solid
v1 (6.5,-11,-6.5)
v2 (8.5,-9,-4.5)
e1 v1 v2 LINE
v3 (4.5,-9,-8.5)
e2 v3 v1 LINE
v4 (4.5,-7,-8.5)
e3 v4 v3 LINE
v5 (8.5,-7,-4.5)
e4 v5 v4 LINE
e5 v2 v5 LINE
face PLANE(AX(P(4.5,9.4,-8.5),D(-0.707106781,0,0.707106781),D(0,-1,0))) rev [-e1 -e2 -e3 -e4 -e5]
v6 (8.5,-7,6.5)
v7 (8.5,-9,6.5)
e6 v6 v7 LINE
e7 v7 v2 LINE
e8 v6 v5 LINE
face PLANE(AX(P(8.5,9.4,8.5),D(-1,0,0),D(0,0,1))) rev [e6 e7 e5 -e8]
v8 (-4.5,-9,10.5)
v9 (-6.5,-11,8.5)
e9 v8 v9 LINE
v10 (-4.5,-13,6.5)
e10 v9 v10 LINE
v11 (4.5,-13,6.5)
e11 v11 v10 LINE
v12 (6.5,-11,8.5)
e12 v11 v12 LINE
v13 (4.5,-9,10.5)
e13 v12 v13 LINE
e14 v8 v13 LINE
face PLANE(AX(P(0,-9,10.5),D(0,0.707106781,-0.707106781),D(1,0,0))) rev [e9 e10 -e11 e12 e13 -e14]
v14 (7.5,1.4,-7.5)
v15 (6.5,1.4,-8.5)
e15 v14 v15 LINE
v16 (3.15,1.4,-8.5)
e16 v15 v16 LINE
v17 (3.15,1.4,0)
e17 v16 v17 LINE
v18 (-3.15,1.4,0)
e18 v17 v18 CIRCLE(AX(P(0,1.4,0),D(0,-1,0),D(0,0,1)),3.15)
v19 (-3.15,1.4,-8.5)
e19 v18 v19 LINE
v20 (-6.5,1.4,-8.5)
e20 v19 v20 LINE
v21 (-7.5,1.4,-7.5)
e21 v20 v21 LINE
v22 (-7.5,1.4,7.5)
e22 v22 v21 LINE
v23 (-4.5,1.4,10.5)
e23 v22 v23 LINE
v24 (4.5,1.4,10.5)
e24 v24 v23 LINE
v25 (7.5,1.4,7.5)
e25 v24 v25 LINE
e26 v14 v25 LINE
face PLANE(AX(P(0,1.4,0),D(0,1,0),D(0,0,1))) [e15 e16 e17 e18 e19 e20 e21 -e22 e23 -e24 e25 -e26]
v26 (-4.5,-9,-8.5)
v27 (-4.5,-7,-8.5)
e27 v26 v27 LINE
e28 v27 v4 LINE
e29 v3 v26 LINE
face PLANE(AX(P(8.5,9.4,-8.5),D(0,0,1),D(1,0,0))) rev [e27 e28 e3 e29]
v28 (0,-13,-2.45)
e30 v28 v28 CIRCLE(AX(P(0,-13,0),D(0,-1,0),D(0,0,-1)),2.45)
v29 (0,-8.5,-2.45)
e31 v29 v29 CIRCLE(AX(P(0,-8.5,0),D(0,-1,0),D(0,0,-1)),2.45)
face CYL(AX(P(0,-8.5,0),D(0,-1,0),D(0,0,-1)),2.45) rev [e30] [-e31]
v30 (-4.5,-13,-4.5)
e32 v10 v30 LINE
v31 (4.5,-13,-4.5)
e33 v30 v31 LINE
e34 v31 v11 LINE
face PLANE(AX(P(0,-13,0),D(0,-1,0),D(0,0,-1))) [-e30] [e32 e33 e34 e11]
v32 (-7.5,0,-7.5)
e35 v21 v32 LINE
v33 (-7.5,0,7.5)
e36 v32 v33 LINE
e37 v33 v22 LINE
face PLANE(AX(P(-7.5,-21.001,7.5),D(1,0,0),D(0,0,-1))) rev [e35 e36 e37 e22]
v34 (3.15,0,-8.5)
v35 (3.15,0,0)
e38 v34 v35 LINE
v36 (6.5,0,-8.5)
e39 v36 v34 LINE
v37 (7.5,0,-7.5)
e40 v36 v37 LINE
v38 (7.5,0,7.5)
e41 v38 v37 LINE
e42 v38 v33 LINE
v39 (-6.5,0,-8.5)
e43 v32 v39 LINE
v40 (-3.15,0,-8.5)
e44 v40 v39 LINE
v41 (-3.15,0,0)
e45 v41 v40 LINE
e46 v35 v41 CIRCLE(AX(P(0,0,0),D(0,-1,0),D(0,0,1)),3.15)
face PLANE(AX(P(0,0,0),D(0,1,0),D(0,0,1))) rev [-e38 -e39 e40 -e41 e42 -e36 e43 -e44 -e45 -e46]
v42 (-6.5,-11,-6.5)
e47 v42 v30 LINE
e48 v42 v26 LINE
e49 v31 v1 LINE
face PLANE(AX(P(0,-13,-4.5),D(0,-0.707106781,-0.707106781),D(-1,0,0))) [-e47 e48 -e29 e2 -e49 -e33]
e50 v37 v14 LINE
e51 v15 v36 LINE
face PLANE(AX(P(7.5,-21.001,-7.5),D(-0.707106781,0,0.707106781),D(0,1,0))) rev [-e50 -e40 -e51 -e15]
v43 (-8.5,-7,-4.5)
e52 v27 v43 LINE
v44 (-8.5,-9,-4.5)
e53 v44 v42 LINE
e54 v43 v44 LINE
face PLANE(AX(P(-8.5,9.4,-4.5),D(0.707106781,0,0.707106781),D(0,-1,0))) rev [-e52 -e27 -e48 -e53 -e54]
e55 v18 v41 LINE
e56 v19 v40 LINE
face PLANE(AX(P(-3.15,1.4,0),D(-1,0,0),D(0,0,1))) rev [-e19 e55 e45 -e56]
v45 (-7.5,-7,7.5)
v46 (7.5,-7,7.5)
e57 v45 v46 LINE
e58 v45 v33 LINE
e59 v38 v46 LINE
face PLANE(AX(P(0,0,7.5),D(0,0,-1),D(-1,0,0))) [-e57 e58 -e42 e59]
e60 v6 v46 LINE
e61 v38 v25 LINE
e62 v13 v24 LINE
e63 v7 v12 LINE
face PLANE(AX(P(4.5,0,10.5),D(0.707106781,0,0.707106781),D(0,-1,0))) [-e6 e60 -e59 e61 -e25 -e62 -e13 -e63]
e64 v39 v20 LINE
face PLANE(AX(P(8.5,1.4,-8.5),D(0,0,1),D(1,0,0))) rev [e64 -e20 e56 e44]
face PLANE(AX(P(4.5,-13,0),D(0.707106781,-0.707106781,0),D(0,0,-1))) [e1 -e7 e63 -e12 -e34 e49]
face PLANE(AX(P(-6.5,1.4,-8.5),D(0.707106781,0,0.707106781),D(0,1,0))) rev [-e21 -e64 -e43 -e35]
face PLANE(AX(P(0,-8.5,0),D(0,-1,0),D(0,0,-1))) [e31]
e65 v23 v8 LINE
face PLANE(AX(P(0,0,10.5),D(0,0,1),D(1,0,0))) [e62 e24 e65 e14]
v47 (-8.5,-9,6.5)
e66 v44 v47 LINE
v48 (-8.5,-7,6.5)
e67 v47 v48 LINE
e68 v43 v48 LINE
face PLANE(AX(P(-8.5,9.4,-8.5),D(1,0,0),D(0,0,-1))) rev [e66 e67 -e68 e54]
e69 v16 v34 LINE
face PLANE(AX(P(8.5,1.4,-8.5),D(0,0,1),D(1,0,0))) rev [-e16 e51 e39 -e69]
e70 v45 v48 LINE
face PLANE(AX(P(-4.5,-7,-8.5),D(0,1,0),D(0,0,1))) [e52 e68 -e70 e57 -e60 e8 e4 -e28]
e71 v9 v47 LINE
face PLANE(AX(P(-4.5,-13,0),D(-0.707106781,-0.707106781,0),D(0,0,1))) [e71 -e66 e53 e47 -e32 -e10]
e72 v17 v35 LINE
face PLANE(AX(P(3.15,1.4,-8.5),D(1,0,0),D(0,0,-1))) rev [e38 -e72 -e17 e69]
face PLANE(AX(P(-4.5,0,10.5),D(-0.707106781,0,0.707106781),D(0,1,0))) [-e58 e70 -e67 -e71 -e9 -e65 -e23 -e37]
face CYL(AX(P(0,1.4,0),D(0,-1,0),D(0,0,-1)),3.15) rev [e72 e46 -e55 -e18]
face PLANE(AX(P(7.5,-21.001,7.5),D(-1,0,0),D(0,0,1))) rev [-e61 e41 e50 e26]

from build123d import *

# Parameters (mm, degrees)
BOSS_EXTRUDE1_DEPTH = 1.4
BOSS_EXTRUDE2_DEPTH = 15
SKETCH6_W           = 17
SKETCH6_H           = 17
BOSS_EXTRUDE3_DEPTH = 6
CUT_EXTRUDE4_START  = -16
SKETCH8_W           = 17
SKETCH8_H           = 7
CUT_EXTRUDE4_DEPTH  = 16
SKETCH9_W           = 17
SKETCH9_H           = 22.4
BOSS_EXTRUDE4_DEPTH = 2
SKETCH7_4_R         = 2.45
CUT_EXTRUDE3_DEPTH  = 4.5
CHAMFER1_SIZE       = 4
CHAMFER3_SIZE       = 4
CUT_EXTRUDE5_REACH  = 28.158
CHAMFER4_SIZE       = 1
SPLIT1_START        = 2.45
SPLIT1_DEPTH        = 4.05
SPLIT1_START_2      = -4.5
SPLIT1_2_DEPTH      = 2.0499999
SPLIT1_START_3      = -21
SPLIT1_3_DEPTH      = 6
SPLIT1_START_4      = -16.5
SPLIT1_4_OUTLINE_R  = 2.45
SPLIT1_4_DEPTH      = 1.5
SPLIT1_START_5      = -20.859650045
SPLIT1_5_OUTLINE_W  = 20
SPLIT1_5_OUTLINE_H  = 18
SPLIT1_5_DEPTH      = 2.828427125
SPLIT1_START_6      = -22.273863607
SPLIT1_6_OUTLINE_W  = 20
SPLIT1_6_OUTLINE_H  = 18
SPLIT1_6_DEPTH      = 2.828427124
SPLIT1_START_7      = -9
SPLIT1_7_DEPTH      = 20
SPLIT1_8_DEPTH      = 14


with BuildPart() as part:
    # Sketch3 → Boss-Extrude1 (new body)
    with BuildSketch(Plane(origin=(0, 0, 0), x_dir=(1, 0, 0), z_dir=(0, 1, 0))):
        with BuildLine():
            Line((-3.15, 0), (-3.15, 8.5))
            Line((-3.15, 8.5), (-8.5, 8.5))
            Line((-8.5, 8.5), (-8.5, -8.5))
            Line((-8.5, -8.5), (8.5, -8.5))
            Line((8.5, -8.5), (8.5, 8.5))
            Line((8.5, 8.5), (3.15, 8.5))
            Line((3.15, 8.5), (3.15, 0))
            ThreePointArc((3.15, 0), (0, -3.15), (-3.15, 0))
        make_face()
    extrude(amount=BOSS_EXTRUDE1_DEPTH)

    # Sketch4 → Boss-Extrude2 (add)
    with BuildSketch(Plane.XZ):
        with BuildLine():
            Line((7.5, 0), (7.5, -8.5))
            Line((7.5, -8.5), (8.5, -8.5))
            Line((8.5, -8.5), (8.5, 8.5))
            Line((8.5, 8.5), (-8.5, 8.5))
            Line((-8.5, 8.5), (-8.5, -8.5))
            Line((-8.5, -8.5), (-7.5, -8.5))
            Line((-7.5, -8.5), (-7.5, 0))
            ThreePointArc((-7.5, 0), (0, 7.5), (7.5, 0))
        make_face()
    extrude(amount=BOSS_EXTRUDE2_DEPTH)

    # Sketch6 → Boss-Extrude3 (add)
    with BuildSketch(Plane.XZ.offset(15)):
        Rectangle(SKETCH6_W, SKETCH6_H)
    extrude(amount=BOSS_EXTRUDE3_DEPTH)

    # Sketch8 → Cut-Extrude4 (cut)
    with BuildSketch(Plane(origin=(0, 0, -8.5), x_dir=(-1, 0, 0), z_dir=(0, 0, -1)).offset(CUT_EXTRUDE4_START)):
        with Locations((0, -3.5)):
            Rectangle(SKETCH8_W, SKETCH8_H)
    extrude(amount=CUT_EXTRUDE4_DEPTH, mode=Mode.SUBTRACT)

    # Sketch9 → Boss-Extrude4 (add)
    with BuildSketch(Plane.XY.offset(8.5)):
        with Locations((0, -9.8)):
            Rectangle(SKETCH9_W, SKETCH9_H)
    extrude(amount=BOSS_EXTRUDE4_DEPTH)

    # Sketch7<4> → Cut-Extrude3 (cut)
    with BuildSketch(Plane.XZ.offset(21)):
        with Locations(Location((0, 0, 0), (0, 0, 270))):
            Circle(SKETCH7_4_R)
    extrude(amount=-CUT_EXTRUDE3_DEPTH, mode=Mode.SUBTRACT)

    # Chamfer1
    chamfer1_edges = [part.edges().sort_by_distance(p)[0] for p in [
        (0, -21, 10.5),
        (-8.5, -21, 1),
        (0, -21, -8.5),
        (8.5, -21, 1),
    ]]
    chamfer(chamfer1_edges, length=CHAMFER1_SIZE)

    # Chamfer3
    # the kernel refuses this chamfer: 4 mm, written as the material it takes off along each edge
    with BuildSketch(Plane(origin=(8.5, -27.286731952, 10.5), x_dir=(-1, 0, 0), z_dir=(0, 1, 0))) as chamfer3_piece_1:
        Polygon((CHAMFER3_SIZE, 0), (0, -CHAMFER3_SIZE), (0, 0), align=None)
    extrude(amount=38.973463904, mode=Mode.SUBTRACT)
    with BuildSketch(Plane(origin=(8.5, -7, -8.5), x_dir=(-1, 0, 0), z_dir=(0, -1, 0))) as chamfer3_piece_2:
        Polygon((CHAMFER3_SIZE, 0), (0, -CHAMFER3_SIZE), (0, 0), align=None)
    extrude(amount=20.286731952, mode=Mode.SUBTRACT)
    with BuildSketch(Plane(origin=(-8.5, -27.286731952, -8.5), x_dir=(0, 0, 1), z_dir=(0, 1, 0))) as chamfer3_piece_3_section:
        Polygon((CHAMFER3_SIZE, 0), (0, CHAMFER3_SIZE), (0, 0), align=None)
    chamfer3_piece_3 = extrude(amount=30.573463904, mode=Mode.PRIVATE)
    chamfer3_piece_3 = split(chamfer3_piece_3, bisect_by=Plane(origin=(-8.5, 0, -8.5), z_dir=(0, -1, 0)), keep=Keep.TOP, mode=Mode.PRIVATE)
    add(chamfer3_piece_3, mode=Mode.SUBTRACT)
    with BuildSketch(Plane(origin=(-8.5, 11.686731952, 10.5), x_dir=(0, 0, -1), z_dir=(0, -1, 0))) as chamfer3_piece_4:
        Polygon((CHAMFER3_SIZE, 0), (0, CHAMFER3_SIZE), (0, 0), align=None)
    extrude(amount=38.973463904, mode=Mode.SUBTRACT)

    # Sketch10 → Cut-Extrude5 (cut, up to next)
    with BuildSketch(Plane(origin=(0, 1.4, 0), x_dir=(1, 0, 0), z_dir=(0, 1, 0)), mode=Mode.PRIVATE) as cut_extrude5_sk1:
        Polygon((7.5, -7.5), (7.5, 8.5), (8.5, 8.5), (8.5, -6.5), align=None)
    cut_extrude5_tool1 = extrude(cut_extrude5_sk1.sketch, amount=-CUT_EXTRUDE5_REACH, mode=Mode.PRIVATE) & part.part
    # Sketch10 → Cut-Extrude5 (cut, up to next)
    with BuildSketch(Plane(origin=(0, 1.4, 0), x_dir=(1, 0, 0), z_dir=(0, 1, 0)), mode=Mode.PRIVATE) as cut_extrude5_sk2:
        Polygon((-7.5, -7.5), (-7.5, 8.5), (-8.5, 8.5), (-8.5, -6.5), align=None)
    cut_extrude5_tool2 = extrude(cut_extrude5_sk2.sketch, amount=-CUT_EXTRUDE5_REACH, mode=Mode.PRIVATE) & part.part
    add(cut_extrude5_tool1.solids().sort_by_distance((7.994624, 1.4, -0.747312))[0], mode=Mode.SUBTRACT)
    add(cut_extrude5_tool2.solids().sort_by_distance((-7.994624, 1.4, -0.747312))[0], mode=Mode.SUBTRACT)

    # Chamfer4
    chamfer4_edges = [part.edges().sort_by_distance(p)[0] for p in [
        (7.5, 0.7, -8.5),
        (-7.5, 0.7, -8.5),
    ]]
    chamfer(chamfer4_edges, length=CHAMFER4_SIZE)

    # Split1 8 outline → Split1 8 (cut)
    with BuildSketch(Plane(origin=(0, 0, 0), x_dir=(1, 0, 0), z_dir=(0, 1, 0)).offset(SPLIT1_START_3)):
        Polygon((-8.5, 4.5), (-8.5, -6.5), (-4.5, -10.5), (4.5, -10.5), (8.5, -6.5), (8.5, 4.5), (4.5, 8.5), (-4.5, 8.5), align=None)
    extrude(amount=SPLIT1_8_DEPTH, mode=Mode.SUBTRACT)


with BuildPart() as body_2:
    # Split1: read off the stored shape, not the designer's step
    # Split1 outline → Split1 (new body)
    with BuildSketch(Plane.XY.offset(SPLIT1_START)):
        Polygon((8.5, -17), (8.5, -15), (-8.5, -15), (-8.5, -17), (-4.5, -21), (4.5, -21), align=None)
    extrude(amount=SPLIT1_DEPTH)

    # Split1 2 outline → Split1 2 (add)
    with BuildSketch(Plane.XY.offset(SPLIT1_START_2)):
        Polygon((8.5, -17), (8.5, -15), (-8.5, -15), (-8.5, -17), (-4.5, -21), (4.5, -21), align=None)
    extrude(amount=SPLIT1_2_DEPTH)

    # Split1 3 outline → Split1 3 (add)
    with BuildSketch(Plane(origin=(0, 0, 0), x_dir=(1, 0, 0), z_dir=(0, 1, 0)).offset(SPLIT1_START_3)):
        with BuildLine():
            ThreePointArc((0, 2.45), (2.45, 0), (0, -2.45))
            Line((0, -2.45), (8.5, -2.45))
            Line((8.5, -2.45), (8.5, 2.4500001))
            Line((8.5, 2.4500001), (0, 2.45))
        make_face()
        with BuildLine():
            ThreePointArc((0, -2.45), (-2.45, 0), (0, 2.45))
            Line((0, 2.45), (-8.5, 2.4500001))
            Line((-8.5, 2.4500001), (-8.5, -2.45))
            Line((-8.5, -2.45), (0, -2.45))
        make_face()
        Polygon((-4.5, 8.5), (-8.5, 4.5), (8.5, 4.5), (4.5, 8.5), align=None)
        Polygon((8.5, -6.5), (-8.5, -6.5), (-4.5, -10.5), (4.5, -10.5), align=None)
    extrude(amount=SPLIT1_3_DEPTH)

    # Split1 4 outline → Split1 4 (add)
    with BuildSketch(Plane(origin=(0, 0, 0), x_dir=(1, 0, 0), z_dir=(0, 1, 0)).offset(SPLIT1_START_4)):
        Circle(SPLIT1_4_OUTLINE_R)
    extrude(amount=SPLIT1_4_DEPTH)

    # Split1 5 outline → Split1 5 (cut)
    with BuildSketch(Plane(origin=(0, 0, 0), x_dir=(1, 0, 0), z_dir=(0, 0.707106781186546, 0.707106781186549)).offset(SPLIT1_START_5)):
        with Locations((0, -14)):
            Rectangle(SPLIT1_5_OUTLINE_W, SPLIT1_5_OUTLINE_H)
    extrude(amount=SPLIT1_5_DEPTH, mode=Mode.SUBTRACT)

    # Split1 6 outline → Split1 6 (cut)
    with BuildSketch(Plane(origin=(0, 0, 0), x_dir=(1, 0, 0), z_dir=(0, 0.707106781186546, -0.707106781186549)).offset(SPLIT1_START_6)):
        with Locations((0, 12)):
            Rectangle(SPLIT1_6_OUTLINE_W, SPLIT1_6_OUTLINE_H)
    extrude(amount=SPLIT1_6_DEPTH, mode=Mode.SUBTRACT)

    # Split1 7 outline → Split1 7 (cut)
    with BuildSketch(Plane.XY.offset(SPLIT1_START_7)):
        Polygon((-8.5, -21), (-4.5, -21), (-8.5, -17), align=None)
        Polygon((8.5, -21), (8.5, -17), (4.5, -21), align=None)
    extrude(amount=SPLIT1_7_DEPTH, mode=Mode.SUBTRACT)


with BuildPart() as body_2_1:
    # Body-Move/Copy2: read off the stored shape, not the designer's step
    # Body-Move/Copy2: moved
    add(body_2.part.moved(Location((0, 8, 0))))


with BuildPart() as part_1:
    add(part.part)

    # Combine2: union body 2
    add(body_2_1.part)


solid = part_1.part
